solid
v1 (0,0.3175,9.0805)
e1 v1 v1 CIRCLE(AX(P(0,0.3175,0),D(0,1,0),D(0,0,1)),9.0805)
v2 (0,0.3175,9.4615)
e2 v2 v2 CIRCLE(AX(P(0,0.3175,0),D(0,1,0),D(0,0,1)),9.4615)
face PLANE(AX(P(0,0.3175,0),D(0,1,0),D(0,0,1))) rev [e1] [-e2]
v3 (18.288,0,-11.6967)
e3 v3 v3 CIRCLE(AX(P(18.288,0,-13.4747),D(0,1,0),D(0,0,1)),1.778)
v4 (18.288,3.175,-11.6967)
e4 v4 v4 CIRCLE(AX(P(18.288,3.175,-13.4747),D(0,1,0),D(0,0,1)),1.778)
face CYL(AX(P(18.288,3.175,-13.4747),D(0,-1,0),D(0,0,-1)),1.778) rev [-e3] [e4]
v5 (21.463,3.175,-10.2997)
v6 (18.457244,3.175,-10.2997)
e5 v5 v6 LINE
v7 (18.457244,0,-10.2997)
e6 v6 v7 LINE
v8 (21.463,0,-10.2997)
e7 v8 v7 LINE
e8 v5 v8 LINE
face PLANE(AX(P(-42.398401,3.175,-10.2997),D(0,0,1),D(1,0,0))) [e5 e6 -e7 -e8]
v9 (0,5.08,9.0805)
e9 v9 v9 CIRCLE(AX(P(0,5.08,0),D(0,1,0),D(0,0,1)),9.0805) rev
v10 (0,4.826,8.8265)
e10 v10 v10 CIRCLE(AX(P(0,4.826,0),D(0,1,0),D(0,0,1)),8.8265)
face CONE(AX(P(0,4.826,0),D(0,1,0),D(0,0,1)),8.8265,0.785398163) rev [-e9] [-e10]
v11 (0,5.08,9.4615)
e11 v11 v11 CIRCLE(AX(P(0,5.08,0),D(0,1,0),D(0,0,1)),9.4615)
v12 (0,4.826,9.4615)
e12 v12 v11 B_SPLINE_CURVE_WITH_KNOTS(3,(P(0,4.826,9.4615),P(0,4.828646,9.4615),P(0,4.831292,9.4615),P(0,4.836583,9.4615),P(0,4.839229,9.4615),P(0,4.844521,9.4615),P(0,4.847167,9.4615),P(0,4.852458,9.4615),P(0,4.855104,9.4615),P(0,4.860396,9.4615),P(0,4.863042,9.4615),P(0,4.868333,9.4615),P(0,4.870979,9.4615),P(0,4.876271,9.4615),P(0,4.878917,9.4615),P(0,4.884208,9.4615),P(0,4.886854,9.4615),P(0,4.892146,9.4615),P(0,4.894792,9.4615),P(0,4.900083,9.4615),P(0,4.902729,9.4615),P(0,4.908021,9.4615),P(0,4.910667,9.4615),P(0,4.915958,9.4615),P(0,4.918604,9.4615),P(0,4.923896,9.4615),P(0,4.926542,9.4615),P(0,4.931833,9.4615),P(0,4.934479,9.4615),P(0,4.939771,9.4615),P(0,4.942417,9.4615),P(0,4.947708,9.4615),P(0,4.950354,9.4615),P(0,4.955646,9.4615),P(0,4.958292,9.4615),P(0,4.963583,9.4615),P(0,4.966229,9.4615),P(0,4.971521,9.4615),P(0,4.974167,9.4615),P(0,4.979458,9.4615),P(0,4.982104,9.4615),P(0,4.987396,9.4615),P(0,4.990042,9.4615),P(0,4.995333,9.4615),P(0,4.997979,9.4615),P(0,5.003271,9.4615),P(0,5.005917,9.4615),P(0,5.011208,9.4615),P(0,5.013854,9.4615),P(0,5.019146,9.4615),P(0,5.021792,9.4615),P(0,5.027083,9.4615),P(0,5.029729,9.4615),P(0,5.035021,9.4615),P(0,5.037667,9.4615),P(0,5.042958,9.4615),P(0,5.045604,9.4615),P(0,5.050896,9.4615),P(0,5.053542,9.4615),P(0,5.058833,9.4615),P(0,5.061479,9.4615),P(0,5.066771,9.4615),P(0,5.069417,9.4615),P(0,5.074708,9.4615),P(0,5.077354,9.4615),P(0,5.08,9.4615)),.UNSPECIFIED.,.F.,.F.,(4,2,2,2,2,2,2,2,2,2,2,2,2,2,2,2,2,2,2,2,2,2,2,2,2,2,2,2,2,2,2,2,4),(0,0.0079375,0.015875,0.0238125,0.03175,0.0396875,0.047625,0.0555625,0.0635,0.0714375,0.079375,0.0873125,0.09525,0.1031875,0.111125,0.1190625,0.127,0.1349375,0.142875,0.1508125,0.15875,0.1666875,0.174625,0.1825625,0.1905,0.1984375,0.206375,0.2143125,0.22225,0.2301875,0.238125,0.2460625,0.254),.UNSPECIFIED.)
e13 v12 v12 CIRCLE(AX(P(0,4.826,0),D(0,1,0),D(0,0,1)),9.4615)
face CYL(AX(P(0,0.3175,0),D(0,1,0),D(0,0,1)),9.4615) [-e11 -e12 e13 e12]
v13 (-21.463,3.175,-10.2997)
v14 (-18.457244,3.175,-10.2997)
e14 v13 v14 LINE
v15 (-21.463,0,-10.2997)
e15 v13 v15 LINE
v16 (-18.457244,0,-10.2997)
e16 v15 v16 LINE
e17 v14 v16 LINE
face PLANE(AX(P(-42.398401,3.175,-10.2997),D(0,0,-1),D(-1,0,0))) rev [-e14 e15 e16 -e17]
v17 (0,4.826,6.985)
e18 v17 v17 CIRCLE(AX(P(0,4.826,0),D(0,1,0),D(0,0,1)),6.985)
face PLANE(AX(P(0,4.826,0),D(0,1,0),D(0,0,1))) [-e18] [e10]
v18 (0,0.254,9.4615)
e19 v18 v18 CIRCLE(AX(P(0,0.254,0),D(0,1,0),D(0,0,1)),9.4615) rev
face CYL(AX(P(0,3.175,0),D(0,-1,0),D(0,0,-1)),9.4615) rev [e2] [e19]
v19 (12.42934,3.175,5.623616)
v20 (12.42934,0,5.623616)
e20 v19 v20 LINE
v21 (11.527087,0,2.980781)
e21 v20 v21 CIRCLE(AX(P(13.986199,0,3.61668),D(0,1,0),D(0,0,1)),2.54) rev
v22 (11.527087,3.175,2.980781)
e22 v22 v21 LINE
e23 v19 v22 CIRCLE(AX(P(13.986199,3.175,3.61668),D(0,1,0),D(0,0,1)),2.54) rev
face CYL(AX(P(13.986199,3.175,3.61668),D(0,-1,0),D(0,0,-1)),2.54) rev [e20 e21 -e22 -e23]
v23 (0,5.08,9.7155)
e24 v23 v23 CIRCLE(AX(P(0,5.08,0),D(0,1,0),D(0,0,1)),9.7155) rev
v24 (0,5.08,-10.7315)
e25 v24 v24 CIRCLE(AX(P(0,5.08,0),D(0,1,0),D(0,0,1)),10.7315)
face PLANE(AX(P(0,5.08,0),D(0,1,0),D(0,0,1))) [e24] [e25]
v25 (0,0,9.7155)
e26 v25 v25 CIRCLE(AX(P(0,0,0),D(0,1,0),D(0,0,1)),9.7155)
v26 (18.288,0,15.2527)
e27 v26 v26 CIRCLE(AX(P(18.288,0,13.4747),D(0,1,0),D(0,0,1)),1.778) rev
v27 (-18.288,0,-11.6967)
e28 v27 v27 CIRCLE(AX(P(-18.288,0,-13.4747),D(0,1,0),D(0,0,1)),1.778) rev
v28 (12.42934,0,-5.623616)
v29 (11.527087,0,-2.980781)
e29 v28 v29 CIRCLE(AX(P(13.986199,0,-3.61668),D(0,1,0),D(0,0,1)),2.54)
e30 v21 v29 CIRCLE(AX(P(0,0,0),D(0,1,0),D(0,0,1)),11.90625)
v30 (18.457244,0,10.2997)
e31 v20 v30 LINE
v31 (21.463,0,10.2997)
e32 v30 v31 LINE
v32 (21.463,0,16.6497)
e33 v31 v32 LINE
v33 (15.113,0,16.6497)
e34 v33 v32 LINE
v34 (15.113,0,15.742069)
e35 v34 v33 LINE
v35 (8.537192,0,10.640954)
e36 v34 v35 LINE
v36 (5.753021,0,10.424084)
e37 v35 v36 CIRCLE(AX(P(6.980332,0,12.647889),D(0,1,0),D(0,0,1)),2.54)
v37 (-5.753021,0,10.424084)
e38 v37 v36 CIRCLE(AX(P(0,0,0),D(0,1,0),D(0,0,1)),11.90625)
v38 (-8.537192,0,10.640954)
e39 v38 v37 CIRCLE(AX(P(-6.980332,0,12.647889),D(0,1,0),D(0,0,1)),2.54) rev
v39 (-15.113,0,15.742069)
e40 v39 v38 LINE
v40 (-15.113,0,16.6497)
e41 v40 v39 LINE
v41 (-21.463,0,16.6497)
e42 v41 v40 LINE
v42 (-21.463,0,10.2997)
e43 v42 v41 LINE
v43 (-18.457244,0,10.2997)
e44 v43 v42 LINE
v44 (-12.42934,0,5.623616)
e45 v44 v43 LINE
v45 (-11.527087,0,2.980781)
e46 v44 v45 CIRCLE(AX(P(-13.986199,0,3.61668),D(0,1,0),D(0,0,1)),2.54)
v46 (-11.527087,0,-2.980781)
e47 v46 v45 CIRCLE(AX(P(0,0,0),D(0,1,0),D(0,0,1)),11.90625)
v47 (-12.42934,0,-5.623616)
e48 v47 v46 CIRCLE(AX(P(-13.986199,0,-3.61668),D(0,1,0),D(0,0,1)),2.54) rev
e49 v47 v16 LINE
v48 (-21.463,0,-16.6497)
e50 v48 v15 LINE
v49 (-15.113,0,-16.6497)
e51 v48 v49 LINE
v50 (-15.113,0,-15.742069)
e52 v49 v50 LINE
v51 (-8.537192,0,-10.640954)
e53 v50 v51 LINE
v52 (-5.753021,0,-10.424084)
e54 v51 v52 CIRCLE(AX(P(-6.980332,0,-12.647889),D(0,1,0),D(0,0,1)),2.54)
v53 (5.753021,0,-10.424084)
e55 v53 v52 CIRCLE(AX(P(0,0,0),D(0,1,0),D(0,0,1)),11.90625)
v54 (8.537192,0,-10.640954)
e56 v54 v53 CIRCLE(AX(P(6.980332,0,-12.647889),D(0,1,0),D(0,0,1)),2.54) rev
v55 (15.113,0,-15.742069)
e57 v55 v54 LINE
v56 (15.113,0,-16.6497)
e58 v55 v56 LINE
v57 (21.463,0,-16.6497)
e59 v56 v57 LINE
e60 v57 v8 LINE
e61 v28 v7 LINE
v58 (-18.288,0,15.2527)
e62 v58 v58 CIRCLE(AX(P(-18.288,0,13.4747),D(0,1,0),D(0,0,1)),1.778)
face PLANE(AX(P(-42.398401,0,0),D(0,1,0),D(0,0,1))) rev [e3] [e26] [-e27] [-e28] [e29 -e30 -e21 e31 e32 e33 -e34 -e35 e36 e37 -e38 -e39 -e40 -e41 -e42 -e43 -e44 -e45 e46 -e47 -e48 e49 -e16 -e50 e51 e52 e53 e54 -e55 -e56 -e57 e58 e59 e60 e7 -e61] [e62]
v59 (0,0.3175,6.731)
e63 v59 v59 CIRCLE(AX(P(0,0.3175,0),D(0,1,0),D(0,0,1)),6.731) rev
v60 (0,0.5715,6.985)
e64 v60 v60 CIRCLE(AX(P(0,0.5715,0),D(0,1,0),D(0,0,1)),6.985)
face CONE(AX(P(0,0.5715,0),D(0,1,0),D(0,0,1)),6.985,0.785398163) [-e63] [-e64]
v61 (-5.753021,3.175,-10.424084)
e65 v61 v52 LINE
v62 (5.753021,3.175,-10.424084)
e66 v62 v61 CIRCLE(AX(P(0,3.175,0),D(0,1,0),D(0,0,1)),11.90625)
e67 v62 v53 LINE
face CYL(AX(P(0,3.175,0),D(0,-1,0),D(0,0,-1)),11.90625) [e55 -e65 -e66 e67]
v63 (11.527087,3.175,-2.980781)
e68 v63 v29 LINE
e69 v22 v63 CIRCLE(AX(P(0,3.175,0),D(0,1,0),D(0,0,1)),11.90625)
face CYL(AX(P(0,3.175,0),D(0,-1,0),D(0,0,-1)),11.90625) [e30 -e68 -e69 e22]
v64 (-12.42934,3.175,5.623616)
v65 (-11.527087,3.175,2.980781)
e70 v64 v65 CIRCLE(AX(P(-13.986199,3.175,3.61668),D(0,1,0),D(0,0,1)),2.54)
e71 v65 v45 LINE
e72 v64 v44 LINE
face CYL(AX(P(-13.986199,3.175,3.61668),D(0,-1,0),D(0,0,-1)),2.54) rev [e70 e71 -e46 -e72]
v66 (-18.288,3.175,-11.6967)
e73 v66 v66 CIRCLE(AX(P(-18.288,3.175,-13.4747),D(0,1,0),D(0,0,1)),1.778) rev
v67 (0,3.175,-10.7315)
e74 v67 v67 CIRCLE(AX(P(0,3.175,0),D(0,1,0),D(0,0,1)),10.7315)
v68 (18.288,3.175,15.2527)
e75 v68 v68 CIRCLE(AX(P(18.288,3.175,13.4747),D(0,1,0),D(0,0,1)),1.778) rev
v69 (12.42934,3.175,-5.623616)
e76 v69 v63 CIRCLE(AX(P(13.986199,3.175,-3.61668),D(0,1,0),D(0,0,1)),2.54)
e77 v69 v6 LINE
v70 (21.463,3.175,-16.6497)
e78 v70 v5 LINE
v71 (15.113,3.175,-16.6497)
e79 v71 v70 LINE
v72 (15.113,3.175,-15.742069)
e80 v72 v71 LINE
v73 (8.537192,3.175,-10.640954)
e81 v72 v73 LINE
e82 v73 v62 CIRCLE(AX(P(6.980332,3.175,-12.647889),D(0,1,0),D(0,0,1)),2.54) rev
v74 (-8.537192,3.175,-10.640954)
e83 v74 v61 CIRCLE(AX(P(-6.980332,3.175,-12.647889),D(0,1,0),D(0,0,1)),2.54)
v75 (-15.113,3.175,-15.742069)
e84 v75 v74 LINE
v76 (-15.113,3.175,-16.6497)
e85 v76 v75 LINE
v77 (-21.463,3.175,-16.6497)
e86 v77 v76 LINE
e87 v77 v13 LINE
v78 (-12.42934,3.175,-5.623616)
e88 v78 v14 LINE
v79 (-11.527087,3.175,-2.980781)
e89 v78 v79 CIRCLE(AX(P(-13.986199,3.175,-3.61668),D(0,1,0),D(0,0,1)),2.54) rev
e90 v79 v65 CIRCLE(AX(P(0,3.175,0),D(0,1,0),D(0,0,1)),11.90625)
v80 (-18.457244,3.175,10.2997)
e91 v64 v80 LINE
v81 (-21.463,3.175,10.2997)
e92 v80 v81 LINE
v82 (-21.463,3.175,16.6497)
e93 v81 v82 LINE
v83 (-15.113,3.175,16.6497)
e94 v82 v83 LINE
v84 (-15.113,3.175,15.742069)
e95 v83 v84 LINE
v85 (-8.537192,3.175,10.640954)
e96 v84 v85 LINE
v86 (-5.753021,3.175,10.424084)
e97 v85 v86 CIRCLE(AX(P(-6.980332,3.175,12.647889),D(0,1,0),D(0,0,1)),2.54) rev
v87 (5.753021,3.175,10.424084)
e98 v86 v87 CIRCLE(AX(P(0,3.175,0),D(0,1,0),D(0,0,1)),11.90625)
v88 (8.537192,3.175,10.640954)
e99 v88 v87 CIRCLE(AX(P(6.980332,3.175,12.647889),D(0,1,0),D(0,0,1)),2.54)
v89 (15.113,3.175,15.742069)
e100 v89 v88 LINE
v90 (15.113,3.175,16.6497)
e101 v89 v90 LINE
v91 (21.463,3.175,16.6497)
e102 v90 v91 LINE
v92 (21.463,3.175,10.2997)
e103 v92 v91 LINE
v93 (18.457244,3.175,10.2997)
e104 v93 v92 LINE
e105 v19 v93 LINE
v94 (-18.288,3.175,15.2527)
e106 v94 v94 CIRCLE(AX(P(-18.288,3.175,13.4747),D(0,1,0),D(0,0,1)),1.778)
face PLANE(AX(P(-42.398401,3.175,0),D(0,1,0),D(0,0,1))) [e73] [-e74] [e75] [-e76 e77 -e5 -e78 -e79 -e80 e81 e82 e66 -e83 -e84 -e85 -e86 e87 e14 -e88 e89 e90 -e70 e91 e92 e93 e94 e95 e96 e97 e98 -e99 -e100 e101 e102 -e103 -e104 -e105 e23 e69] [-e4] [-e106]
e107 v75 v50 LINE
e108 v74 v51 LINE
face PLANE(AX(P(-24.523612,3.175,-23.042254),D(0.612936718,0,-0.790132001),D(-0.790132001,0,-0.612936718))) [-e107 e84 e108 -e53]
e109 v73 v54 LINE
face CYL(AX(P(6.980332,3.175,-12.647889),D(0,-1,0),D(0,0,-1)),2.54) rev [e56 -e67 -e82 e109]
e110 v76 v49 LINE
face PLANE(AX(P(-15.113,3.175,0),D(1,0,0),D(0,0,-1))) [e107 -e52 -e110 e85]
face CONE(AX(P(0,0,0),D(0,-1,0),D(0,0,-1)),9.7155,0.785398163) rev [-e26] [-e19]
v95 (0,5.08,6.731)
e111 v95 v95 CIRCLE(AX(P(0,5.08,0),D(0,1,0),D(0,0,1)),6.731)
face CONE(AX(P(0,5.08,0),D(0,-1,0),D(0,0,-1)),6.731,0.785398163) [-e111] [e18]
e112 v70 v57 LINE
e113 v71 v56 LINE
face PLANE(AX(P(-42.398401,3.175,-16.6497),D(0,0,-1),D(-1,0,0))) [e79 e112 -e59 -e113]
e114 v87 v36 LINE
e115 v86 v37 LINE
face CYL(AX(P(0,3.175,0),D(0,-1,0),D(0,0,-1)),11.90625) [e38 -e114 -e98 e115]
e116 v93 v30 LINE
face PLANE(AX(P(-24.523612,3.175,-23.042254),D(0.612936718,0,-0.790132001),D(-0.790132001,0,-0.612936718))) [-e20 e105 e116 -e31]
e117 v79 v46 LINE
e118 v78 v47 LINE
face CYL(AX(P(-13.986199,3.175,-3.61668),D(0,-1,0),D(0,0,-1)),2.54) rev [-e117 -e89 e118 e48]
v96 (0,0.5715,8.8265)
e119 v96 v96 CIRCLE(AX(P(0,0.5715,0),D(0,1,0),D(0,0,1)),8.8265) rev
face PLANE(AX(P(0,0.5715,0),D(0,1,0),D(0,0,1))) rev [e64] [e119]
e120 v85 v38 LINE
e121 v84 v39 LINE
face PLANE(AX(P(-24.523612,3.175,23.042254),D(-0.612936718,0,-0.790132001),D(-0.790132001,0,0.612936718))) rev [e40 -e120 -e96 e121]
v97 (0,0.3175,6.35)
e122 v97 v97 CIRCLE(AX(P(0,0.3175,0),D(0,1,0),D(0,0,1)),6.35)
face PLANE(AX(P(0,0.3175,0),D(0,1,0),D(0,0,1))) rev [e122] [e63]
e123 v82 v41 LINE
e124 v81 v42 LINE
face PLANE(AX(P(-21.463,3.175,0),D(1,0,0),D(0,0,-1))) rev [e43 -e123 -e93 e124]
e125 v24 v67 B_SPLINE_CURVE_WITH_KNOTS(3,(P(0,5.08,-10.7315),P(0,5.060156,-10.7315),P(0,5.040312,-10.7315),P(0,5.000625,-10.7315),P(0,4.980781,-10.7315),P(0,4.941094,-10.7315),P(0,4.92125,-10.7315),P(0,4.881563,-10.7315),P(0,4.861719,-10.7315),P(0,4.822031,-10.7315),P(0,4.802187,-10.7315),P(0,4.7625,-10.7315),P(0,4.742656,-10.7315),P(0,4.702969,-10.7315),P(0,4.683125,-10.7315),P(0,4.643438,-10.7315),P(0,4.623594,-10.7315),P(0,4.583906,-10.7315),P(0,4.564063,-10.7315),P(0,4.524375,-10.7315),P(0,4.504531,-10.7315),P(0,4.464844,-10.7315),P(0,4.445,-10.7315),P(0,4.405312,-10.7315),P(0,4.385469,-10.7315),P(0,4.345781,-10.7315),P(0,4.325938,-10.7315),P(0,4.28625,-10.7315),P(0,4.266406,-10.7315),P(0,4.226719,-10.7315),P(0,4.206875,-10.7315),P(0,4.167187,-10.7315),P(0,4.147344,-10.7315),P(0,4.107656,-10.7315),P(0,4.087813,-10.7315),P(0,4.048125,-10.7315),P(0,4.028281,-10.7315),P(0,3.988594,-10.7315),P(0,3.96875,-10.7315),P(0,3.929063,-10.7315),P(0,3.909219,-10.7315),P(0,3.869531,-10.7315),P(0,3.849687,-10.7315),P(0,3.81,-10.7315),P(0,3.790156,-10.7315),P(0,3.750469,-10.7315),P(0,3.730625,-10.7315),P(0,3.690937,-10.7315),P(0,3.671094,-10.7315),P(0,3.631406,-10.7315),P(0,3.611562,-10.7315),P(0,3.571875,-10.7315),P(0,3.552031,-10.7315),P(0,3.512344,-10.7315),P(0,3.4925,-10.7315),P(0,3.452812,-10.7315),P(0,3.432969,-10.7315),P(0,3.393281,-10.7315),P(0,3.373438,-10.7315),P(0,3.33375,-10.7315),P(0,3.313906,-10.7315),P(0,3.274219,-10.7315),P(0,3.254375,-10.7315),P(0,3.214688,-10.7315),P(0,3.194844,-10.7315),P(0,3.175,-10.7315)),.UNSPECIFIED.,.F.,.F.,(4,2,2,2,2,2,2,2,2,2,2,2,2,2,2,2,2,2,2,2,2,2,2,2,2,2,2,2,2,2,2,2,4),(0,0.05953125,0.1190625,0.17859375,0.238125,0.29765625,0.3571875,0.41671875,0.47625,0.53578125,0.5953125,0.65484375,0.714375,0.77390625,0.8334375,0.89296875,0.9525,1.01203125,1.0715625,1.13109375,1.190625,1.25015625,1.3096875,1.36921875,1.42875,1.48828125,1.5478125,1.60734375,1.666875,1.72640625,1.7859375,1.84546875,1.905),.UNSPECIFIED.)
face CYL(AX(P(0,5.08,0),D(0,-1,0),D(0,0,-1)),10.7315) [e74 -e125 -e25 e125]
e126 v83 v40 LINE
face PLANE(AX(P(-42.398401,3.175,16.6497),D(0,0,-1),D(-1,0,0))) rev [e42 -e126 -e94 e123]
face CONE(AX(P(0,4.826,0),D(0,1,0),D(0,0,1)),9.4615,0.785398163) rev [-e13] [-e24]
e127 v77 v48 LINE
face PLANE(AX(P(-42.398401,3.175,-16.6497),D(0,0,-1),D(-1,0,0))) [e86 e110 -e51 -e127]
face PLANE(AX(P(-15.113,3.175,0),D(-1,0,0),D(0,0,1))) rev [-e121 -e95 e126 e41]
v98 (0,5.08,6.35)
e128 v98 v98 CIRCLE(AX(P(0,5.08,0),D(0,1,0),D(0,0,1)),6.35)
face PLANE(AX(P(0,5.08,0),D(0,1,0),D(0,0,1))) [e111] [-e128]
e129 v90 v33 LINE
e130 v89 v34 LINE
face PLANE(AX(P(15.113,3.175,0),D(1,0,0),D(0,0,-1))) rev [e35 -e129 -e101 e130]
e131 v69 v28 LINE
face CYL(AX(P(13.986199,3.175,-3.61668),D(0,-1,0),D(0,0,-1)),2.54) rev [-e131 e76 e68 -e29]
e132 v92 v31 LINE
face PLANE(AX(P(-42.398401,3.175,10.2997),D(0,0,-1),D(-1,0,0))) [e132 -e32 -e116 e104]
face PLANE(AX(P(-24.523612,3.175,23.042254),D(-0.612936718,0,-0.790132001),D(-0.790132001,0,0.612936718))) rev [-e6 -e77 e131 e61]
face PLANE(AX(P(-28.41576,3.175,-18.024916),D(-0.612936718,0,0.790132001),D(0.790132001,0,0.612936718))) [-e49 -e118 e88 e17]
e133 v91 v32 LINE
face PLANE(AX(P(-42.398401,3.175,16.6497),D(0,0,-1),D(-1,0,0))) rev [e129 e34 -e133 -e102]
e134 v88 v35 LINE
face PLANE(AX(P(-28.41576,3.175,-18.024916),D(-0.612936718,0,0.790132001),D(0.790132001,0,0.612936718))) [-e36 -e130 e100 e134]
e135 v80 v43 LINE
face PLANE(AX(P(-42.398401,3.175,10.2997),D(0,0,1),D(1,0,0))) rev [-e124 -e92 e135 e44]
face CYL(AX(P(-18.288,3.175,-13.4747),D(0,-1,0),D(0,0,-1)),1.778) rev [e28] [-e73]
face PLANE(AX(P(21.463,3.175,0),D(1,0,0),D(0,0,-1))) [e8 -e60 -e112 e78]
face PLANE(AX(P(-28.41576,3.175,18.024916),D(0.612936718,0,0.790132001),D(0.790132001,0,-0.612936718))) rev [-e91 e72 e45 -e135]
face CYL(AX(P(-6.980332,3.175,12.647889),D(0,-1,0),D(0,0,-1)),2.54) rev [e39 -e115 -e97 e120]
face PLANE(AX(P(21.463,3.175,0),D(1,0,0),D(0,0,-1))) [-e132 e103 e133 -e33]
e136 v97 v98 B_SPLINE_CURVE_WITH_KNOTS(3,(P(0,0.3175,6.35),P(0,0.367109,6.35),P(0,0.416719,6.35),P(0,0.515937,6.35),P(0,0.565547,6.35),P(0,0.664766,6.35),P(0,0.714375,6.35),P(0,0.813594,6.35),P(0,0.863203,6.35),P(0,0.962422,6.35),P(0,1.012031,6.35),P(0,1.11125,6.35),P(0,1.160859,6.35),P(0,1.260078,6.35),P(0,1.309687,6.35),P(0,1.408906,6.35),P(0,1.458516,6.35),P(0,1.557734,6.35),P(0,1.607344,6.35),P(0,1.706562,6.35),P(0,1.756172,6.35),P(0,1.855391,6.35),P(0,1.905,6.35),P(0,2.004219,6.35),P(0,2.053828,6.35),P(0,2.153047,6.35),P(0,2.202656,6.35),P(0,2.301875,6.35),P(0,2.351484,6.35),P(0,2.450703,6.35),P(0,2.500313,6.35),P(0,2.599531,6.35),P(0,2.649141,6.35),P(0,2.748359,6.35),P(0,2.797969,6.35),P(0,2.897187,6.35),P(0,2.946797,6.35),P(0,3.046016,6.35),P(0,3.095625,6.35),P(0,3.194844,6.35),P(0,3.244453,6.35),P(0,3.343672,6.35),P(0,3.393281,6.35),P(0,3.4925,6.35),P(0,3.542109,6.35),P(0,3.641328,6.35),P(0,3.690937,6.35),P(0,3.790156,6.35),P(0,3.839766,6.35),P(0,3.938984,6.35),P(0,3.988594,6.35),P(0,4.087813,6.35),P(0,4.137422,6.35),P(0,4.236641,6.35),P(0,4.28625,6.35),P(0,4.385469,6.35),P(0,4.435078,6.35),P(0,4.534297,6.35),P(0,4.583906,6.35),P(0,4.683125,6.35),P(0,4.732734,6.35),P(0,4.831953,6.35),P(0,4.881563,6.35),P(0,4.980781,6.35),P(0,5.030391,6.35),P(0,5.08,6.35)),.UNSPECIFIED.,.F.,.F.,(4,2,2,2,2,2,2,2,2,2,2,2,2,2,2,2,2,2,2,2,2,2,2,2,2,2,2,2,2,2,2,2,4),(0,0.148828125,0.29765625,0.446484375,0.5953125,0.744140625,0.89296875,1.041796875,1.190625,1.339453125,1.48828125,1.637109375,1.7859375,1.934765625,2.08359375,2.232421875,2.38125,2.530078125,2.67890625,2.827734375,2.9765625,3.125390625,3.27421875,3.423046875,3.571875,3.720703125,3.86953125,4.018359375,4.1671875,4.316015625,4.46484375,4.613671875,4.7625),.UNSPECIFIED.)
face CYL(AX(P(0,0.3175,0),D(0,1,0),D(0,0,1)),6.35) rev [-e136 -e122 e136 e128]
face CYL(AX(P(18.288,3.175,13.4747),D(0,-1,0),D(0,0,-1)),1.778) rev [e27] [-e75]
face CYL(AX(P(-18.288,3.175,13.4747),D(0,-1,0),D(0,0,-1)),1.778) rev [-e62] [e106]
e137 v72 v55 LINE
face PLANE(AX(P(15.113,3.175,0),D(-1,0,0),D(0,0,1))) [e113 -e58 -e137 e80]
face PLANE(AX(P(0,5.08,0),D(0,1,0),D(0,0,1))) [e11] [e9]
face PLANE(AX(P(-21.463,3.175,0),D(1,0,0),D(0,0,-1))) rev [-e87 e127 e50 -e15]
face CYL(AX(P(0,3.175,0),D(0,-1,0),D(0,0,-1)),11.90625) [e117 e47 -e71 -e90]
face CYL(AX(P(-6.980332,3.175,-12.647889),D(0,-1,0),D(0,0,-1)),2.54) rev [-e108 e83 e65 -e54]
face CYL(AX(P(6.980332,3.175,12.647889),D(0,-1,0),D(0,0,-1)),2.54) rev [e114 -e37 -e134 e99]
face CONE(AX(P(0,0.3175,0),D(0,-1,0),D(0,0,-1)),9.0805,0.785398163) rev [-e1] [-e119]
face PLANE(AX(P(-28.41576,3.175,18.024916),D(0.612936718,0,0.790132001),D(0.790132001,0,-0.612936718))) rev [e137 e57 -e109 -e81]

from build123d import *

# Parameters (mm, degrees)
SKETCH1_R           = 9.4615
SKETCH1_R_2         = 1.778
BOSS_EXTRUDE1_DEPTH = 3.175
SKETCH2_R           = 10.7315
SKETCH2_R_2         = 9.4615
BOSS_EXTRUDE2_DEPTH = 1.905
CHAMFER1_SIZE       = 0.254
SKETCH3_R           = 9.4615
SKETCH3_R_2         = 8.8265
BOSS_EXTRUDE3_DEPTH = 4.7625
CHAMFER2_SIZE       = 0.254
SKETCH4_R           = 8.8265
SKETCH4_R_2         = 6.985
BOSS_EXTRUDE4_DEPTH = 4.2545
SKETCH5_R           = 6.985
SKETCH5_R_2         = 6.35
BOSS_EXTRUDE5_DEPTH = 4.7625
CHAMFER3_SIZE       = 0.254


with BuildPart() as part:
    # Sketch1 → Boss-Extrude1 (new body)
    with BuildSketch(Plane(origin=(0, 0, 0), x_dir=(1, 0, 0), z_dir=(0, 1, 0))):
        with BuildLine():
            Line((-15.113, -16.6497), (-15.113, -15.742069175))
            Line((-15.113, -15.742069175), (-8.537191562, -10.640953872))
            ThreePointArc((-8.537191562, -10.640953872), (-7.177584853, -10.115559905), (-5.753021125, -10.424084468))
            ThreePointArc((-5.753021125, -10.424084468), (0, -11.90625), (5.753021125, -10.424084468))
            ThreePointArc((5.753021125, -10.424084468), (7.177584853, -10.115559905), (8.537191562, -10.640953872))
            Line((8.537191562, -10.640953872), (15.113, -15.742069175))
            Line((15.113, -15.742069175), (15.113, -16.6497))
            Line((15.113, -16.6497), (21.463, -16.6497))
            Line((21.463, -16.6497), (21.463, -10.2997))
            Line((21.463, -10.2997), (18.457244016, -10.2997))
            Line((18.457244016, -10.2997), (12.429339722, -5.623615663))
            ThreePointArc((12.429339722, -5.623615663), (11.582420607, -4.43732007), (11.527087077, -2.980780533))
            ThreePointArc((11.527087077, -2.980780533), (11.90625, 0), (11.527087077, 2.980780533))
            ThreePointArc((11.527087077, 2.980780533), (11.582420607, 4.43732007), (12.429339722, 5.623615663))
            Line((12.429339722, 5.623615663), (18.457244016, 10.2997))
            Line((18.457244016, 10.2997), (21.463, 10.2997))
            Line((21.463, 10.2997), (21.463, 16.6497))
            Line((21.463, 16.6497), (15.113, 16.6497))
            Line((15.113, 16.6497), (15.113, 15.742069175))
            Line((15.113, 15.742069175), (8.537191562, 10.640953872))
            ThreePointArc((8.537191562, 10.640953872), (7.177584853, 10.115559905), (5.753021125, 10.424084468))
            ThreePointArc((5.753021125, 10.424084468), (0, 11.90625), (-5.753021125, 10.424084468))
            ThreePointArc((-5.753021125, 10.424084468), (-7.177584853, 10.115559905), (-8.537191562, 10.640953872))
            Line((-8.537191562, 10.640953872), (-15.113, 15.742069175))
            Line((-15.113, 15.742069175), (-15.113, 16.6497))
            Line((-15.113, 16.6497), (-21.463, 16.6497))
            Line((-21.463, 16.6497), (-21.463, 10.2997))
            Line((-21.463, 10.2997), (-18.457244016, 10.2997))
            Line((-18.457244016, 10.2997), (-12.429339722, 5.623615663))
            ThreePointArc((-12.429339722, 5.623615663), (-11.582420607, 4.43732007), (-11.527087077, 2.980780533))
            ThreePointArc((-11.527087077, 2.980780533), (-11.90625, 0), (-11.527087077, -2.980780533))
            ThreePointArc((-11.527087077, -2.980780533), (-11.582420607, -4.43732007), (-12.429339722, -5.623615663))
            Line((-12.429339722, -5.623615663), (-18.457244016, -10.2997))
            Line((-18.457244016, -10.2997), (-21.463, -10.2997))
            Line((-21.463, -10.2997), (-21.463, -16.6497))
            Line((-21.463, -16.6497), (-15.113, -16.6497))
        make_face()
        with Locations(Location((0, 0, 0), (0, 0, 270))):
            Circle(SKETCH1_R, mode=Mode.SUBTRACT)
        with Locations(Location((-18.288, -13.4747, 0), (0, 0, 270))):
            Circle(SKETCH1_R_2, mode=Mode.SUBTRACT)
        with Locations(Location((-18.288, 13.4747, 0), (0, 0, 270))):
            Circle(SKETCH1_R_2, mode=Mode.SUBTRACT)
        with Locations(Location((18.288, -13.4747, 0), (0, 0, 270))):
            Circle(SKETCH1_R_2, mode=Mode.SUBTRACT)
        with Locations(Location((18.288, 13.4747, 0), (0, 0, 270))):
            Circle(SKETCH1_R_2, mode=Mode.SUBTRACT)
    extrude(amount=BOSS_EXTRUDE1_DEPTH)

    # Sketch2 → Boss-Extrude2 (add)
    with BuildSketch(Plane(origin=(0, 3.175, 0), x_dir=(1, 0, 0), z_dir=(0, 1, 0))):
        with Locations(Location((0, 0, 0), (0, 0, 90))):
            Circle(SKETCH2_R)
        with Locations(Location((0, 0, 0), (0, 0, 270))):
            Circle(SKETCH2_R_2, mode=Mode.SUBTRACT)
    extrude(amount=BOSS_EXTRUDE2_DEPTH)

    # Chamfer1
    chamfer1_edges = [part.edges().sort_by_distance(p)[0] for p in [
        (0, 5.08, -9.4615),
        (0, 0, -9.4615),
    ]]
    chamfer(chamfer1_edges, length=CHAMFER1_SIZE)



with BuildPart() as body_2:
    # Sketch3 → Boss-Extrude3 (new body)
    with BuildSketch(Plane(origin=(0, 5.08, 0), x_dir=(1, 0, 0), z_dir=(0, 1, 0))):
        with Locations(Location((0, 0, 0), (0, 0, 270))):
            Circle(SKETCH3_R)
        with Locations(Location((0, 0, 0), (0, 0, 270))):
            Circle(SKETCH3_R_2, mode=Mode.SUBTRACT)
    extrude(amount=-BOSS_EXTRUDE3_DEPTH)

    # Chamfer2
    chamfer2_edges = [body_2.edges().sort_by_distance(p)[0] for p in [
        (0, 0.3175, -8.8265),
        (0, 5.08, -8.8265),
    ]]
    chamfer(chamfer2_edges, length=CHAMFER2_SIZE)


with BuildPart() as part_1:
    add(part.part)

    add(body_2.part)  # Boss-Extrude4 merges body 2
    # Sketch4 → Boss-Extrude4 (add)
    with BuildSketch(Plane(origin=(0, 4.826, 0), x_dir=(-1, 0, 0), z_dir=(0, 1, 0))):
        Circle(SKETCH4_R)
        with Locations(Location((0, 0, 0), (0, 0, 90))):
            Circle(SKETCH4_R_2, mode=Mode.SUBTRACT)
    extrude(amount=-BOSS_EXTRUDE4_DEPTH)

    # Sketch5 → Boss-Extrude5 (add)
    with BuildSketch(Plane(origin=(0, 5.08, 0), x_dir=(1, 0, 0), z_dir=(0, 1, 0))):
        with Locations(Location((0, 0, 0), (0, 0, 270))):
            Circle(SKETCH5_R)
        with Locations(Location((0, 0, 0), (0, 0, 270))):
            Circle(SKETCH5_R_2, mode=Mode.SUBTRACT)
    extrude(amount=-BOSS_EXTRUDE5_DEPTH)

    # Chamfer3
    chamfer3_edges = [part_1.edges().sort_by_distance(p)[0] for p in [
        (0, 0.3175, -6.985),
        (0, 5.08, -6.985),
    ]]
    chamfer(chamfer3_edges, length=CHAMFER3_SIZE - 0.0001)  # a hair under: the kernel refuses the full size


solid = part_1.part
